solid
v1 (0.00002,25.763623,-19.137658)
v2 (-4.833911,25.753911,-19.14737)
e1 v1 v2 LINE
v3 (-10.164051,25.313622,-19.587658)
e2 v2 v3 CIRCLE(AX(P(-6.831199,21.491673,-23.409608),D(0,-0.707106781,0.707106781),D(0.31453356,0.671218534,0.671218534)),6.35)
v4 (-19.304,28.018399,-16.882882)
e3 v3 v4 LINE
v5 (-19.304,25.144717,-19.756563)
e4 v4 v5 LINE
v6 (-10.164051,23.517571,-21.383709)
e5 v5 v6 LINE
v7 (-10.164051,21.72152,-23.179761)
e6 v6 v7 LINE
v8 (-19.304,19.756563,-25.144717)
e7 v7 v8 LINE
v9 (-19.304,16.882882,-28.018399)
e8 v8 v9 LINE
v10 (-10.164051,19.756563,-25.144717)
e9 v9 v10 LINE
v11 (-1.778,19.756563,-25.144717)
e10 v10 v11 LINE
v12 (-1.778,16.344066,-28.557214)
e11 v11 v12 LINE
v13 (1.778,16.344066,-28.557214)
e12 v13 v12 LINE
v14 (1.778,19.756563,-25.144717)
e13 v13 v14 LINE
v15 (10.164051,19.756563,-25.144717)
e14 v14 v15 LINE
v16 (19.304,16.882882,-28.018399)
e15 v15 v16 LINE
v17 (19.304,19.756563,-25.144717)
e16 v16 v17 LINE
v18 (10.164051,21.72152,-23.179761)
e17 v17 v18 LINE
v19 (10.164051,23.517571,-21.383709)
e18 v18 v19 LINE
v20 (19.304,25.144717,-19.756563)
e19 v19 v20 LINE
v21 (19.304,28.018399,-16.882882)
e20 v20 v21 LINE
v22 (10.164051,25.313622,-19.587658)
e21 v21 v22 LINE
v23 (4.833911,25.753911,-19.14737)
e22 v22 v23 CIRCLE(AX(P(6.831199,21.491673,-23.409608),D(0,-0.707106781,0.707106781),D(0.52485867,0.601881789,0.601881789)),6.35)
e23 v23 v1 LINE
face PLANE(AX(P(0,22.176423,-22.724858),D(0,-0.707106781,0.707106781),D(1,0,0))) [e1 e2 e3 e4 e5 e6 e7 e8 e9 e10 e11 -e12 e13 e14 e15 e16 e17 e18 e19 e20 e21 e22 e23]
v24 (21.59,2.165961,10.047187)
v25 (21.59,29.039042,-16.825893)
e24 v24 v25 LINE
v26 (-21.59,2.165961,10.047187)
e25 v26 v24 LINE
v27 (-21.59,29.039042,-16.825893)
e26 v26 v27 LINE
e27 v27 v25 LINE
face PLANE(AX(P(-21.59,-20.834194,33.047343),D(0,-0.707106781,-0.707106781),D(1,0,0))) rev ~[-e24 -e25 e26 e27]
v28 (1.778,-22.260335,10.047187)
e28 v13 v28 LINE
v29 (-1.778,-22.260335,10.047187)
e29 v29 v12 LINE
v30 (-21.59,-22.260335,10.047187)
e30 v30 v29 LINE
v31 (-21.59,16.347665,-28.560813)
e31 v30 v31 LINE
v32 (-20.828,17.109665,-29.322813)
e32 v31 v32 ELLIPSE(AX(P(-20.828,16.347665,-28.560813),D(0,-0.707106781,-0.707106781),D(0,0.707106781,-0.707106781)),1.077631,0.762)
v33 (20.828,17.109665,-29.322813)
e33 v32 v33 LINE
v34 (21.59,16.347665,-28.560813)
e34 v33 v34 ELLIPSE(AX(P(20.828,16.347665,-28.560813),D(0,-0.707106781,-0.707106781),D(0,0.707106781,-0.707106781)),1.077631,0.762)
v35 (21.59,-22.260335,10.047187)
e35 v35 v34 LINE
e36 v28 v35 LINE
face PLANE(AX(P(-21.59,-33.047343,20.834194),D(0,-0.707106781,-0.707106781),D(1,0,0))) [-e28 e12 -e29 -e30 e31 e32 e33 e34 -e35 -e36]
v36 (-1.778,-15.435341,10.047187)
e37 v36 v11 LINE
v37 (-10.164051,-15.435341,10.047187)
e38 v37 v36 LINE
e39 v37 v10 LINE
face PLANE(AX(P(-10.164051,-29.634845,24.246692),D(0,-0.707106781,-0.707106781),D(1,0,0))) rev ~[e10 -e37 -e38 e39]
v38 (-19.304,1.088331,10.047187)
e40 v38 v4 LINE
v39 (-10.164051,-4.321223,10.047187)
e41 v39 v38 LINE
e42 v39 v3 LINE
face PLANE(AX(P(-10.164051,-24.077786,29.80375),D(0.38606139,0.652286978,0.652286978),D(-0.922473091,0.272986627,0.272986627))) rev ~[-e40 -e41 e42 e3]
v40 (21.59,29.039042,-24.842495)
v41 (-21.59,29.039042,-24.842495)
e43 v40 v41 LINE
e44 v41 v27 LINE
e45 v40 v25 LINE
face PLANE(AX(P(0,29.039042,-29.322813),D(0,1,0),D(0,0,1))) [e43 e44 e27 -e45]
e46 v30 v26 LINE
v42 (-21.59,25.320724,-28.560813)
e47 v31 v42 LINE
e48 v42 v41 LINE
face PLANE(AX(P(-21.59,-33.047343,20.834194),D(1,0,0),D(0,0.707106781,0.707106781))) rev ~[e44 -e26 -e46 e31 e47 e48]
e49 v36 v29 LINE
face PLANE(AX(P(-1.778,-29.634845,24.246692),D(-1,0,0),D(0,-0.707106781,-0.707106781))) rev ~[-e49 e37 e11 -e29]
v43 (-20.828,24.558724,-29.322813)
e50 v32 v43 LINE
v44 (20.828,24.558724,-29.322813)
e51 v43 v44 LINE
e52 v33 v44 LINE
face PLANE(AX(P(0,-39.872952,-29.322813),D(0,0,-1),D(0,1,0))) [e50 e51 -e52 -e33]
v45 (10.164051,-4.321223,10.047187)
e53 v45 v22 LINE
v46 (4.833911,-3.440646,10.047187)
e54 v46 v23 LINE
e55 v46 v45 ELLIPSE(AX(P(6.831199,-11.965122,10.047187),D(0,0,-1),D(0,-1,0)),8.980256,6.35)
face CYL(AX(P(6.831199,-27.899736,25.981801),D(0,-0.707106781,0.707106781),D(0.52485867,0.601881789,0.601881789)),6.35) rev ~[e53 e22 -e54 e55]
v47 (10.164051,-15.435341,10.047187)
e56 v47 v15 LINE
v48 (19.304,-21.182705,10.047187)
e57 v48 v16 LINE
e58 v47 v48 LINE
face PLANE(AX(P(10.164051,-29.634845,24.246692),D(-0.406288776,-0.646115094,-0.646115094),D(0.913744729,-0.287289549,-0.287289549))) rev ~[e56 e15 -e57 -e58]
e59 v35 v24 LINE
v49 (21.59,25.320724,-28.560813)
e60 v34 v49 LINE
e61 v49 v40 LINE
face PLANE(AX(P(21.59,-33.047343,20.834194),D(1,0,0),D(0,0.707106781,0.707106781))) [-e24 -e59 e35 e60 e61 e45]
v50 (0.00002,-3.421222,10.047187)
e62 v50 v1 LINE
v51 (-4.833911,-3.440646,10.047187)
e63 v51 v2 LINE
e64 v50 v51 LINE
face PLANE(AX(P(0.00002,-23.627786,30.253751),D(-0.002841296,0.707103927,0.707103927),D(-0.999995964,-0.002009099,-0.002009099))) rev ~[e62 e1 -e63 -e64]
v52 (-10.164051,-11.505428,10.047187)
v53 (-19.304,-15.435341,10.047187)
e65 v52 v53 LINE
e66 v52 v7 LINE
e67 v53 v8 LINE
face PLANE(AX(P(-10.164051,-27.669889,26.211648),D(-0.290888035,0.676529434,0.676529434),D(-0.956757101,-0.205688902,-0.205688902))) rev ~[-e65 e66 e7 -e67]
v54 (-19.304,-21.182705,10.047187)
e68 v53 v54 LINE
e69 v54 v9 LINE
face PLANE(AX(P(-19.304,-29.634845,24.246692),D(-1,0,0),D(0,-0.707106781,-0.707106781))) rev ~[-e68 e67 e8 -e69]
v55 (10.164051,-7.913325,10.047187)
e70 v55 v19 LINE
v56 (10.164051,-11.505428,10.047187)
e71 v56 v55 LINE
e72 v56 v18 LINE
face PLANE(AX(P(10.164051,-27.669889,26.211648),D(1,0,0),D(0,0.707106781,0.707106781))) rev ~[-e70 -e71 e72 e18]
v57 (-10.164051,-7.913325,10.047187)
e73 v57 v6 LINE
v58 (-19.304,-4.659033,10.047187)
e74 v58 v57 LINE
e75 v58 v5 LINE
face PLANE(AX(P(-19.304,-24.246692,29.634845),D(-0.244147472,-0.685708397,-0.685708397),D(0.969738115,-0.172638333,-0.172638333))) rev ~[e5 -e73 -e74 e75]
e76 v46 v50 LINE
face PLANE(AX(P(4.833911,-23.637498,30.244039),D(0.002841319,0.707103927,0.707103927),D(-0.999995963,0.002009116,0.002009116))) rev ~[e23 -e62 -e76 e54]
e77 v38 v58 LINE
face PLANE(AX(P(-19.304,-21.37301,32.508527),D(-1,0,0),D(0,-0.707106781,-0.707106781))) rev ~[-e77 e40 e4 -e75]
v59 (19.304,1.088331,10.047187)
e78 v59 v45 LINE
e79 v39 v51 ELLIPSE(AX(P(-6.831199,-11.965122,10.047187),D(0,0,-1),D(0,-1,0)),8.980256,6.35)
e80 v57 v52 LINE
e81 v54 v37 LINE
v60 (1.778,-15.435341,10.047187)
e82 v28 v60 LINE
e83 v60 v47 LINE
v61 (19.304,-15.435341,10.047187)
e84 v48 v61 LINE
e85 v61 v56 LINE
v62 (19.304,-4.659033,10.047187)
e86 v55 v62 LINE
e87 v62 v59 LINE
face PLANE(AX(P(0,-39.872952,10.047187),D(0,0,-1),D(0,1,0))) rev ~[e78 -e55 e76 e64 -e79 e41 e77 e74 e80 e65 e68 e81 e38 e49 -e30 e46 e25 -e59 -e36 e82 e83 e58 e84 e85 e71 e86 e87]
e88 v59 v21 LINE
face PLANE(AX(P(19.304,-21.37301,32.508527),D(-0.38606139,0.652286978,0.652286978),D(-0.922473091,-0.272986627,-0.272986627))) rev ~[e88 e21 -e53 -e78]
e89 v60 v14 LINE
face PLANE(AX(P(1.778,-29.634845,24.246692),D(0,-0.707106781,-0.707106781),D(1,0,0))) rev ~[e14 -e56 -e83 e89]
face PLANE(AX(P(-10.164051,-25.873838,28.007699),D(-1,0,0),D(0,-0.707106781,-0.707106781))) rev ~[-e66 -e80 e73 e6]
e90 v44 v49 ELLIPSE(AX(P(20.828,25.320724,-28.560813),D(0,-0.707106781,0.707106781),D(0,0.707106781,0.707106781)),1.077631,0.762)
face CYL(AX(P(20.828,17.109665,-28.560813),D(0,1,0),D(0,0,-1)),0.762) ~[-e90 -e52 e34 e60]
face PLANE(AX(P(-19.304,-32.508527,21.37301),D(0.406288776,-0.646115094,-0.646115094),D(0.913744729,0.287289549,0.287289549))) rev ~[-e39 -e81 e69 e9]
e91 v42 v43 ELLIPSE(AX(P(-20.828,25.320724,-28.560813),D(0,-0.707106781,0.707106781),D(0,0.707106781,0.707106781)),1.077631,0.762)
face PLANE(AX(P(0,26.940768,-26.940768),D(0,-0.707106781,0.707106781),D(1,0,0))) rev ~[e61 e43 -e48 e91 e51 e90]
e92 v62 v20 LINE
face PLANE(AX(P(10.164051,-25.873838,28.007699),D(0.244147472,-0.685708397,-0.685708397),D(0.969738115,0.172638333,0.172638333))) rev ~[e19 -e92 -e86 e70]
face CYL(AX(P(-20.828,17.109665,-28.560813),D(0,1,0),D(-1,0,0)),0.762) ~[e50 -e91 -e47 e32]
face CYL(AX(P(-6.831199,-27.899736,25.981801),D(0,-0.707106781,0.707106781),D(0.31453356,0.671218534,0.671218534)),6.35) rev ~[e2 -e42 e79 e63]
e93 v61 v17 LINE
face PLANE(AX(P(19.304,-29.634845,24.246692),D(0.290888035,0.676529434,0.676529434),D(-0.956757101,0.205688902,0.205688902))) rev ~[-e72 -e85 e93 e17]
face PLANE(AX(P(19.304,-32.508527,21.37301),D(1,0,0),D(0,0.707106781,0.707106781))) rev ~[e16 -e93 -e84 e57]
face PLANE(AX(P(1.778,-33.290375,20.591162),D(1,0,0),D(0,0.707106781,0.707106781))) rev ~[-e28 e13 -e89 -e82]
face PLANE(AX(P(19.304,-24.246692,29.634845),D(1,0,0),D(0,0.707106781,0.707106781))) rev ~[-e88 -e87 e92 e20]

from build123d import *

# Parameters (mm, degrees)
F0_W     = 43.18
F0_H     = 17.272
F2_DEPTH = 76.2
F3_DEPTH = 69.85
F6_ANGLE = 45
F8_W     = 97.1712954342
F8_H     = 80.9760764241
F8_W_2   = 68.9119933241
F8_H_2   = 39.37
F9_DEPTH = 38.1
F10_R    = 0.762


# Not quite as in the source:
# - ends of sketch curves that miss each other by under 0.0002 mm in the source are joined


with BuildPart() as f2:
    # F0 (on Front) → F2 (new body)
    with BuildSketch(Plane.XZ):
        Rectangle(F0_W, F0_H)
    extrude(amount=-F2_DEPTH)

    # F1 (on Front) → F3 (cut)
    with BuildSketch(Plane.XZ):
        with BuildLine():
            Line((10.1640512741, -1.0311319662), (10.1640512741, 1.5088680338))
            Line((10.1640512741, 1.5088680338), (19.304, 3.81))
            Line((19.304, 3.81), (19.304, 7.874))
            Line((19.304, 7.874), (10.1640512741, 4.0488680338))
            ThreePointArc((10.1640512741, 4.0488680338), (7.567989059, 4.950925683), (4.8339106143, 4.6715297537))
            Line((4.8339106143, 4.6715297537), (1.97346e-05, 4.6852644338))
            Line((1.97346e-05, 4.6852644338), (-4.8339106143, 4.6715297537))
            ThreePointArc((-4.8339106143, 4.6715297537), (-7.567989059, 4.950925683), (-10.1640512741, 4.0488680338))
            Line((-10.1640512741, 4.0488680338), (-19.304, 7.874))
            Line((-19.304, 7.874), (-19.304, 3.81))
            Line((-19.304, 3.81), (-10.1640512741, 1.5088680338))
            Line((-10.1640512741, 1.5088680338), (-10.1640512741, -1.0311319662))
            Line((-10.1640512741, -1.0311319662), (-19.304, -3.81))
            Line((-19.304, -3.81), (-19.304, -7.874))
            Line((-19.304, -7.874), (-10.1640512741, -3.81))
            Line((-10.1640512741, -3.81), (-1.778, -3.81))
            Line((-1.778, -3.81), (-1.778, -7.874))
            Line((-1.778, -7.874), (-1.778, -8.9796995744))
            Line((-1.778, -8.9796995744), (1.778, -8.9796995744))
            Line((1.778, -8.9796995744), (1.778, -7.874))
            Line((1.778, -7.874), (1.778, -3.81))
            Line((1.778, -3.81), (10.1640512741, -3.81))
            Line((10.1640512741, -3.81), (19.304, -7.874))
            Line((19.304, -7.874), (19.304, -3.81))
            Line((19.304, -3.81), (10.1640512741, -1.0311319662))
        make_face()
    extrude(amount=-F3_DEPTH, mode=Mode.SUBTRACT)


with BuildPart() as f2_1:
    # F4: moved
    add(f2.part.moved(Location((0, -38.1, 0))))


with BuildPart() as f2_2:
    # F6: moved
    add(f2_1.part.rotate(Axis((-4.1610468179, 0, 0), (-1, 0, 0)), F6_ANGLE))

    # F8 (on Right) → F9 (cut, symmetric)
    with BuildSketch(Plane.YZ):
        with Locations((-6.1953347176, -4.1167326272)):
            Rectangle(F8_W, F8_H)
        with Locations((-5.4169551435, -9.6378130603)):
            Rectangle(F8_W_2, F8_H_2, mode=Mode.SUBTRACT)
    extrude(amount=F9_DEPTH, both=True, mode=Mode.SUBTRACT)

    # F10
    f10_edges = [f2_2.edges().sort_by_distance(p)[0] for p in [
        (21.59, 20.834194, -29.322813),
        (-21.59, 20.834194, -29.322813),
    ]]
    fillet(f10_edges, radius=F10_R)


solid = f2_2.part
